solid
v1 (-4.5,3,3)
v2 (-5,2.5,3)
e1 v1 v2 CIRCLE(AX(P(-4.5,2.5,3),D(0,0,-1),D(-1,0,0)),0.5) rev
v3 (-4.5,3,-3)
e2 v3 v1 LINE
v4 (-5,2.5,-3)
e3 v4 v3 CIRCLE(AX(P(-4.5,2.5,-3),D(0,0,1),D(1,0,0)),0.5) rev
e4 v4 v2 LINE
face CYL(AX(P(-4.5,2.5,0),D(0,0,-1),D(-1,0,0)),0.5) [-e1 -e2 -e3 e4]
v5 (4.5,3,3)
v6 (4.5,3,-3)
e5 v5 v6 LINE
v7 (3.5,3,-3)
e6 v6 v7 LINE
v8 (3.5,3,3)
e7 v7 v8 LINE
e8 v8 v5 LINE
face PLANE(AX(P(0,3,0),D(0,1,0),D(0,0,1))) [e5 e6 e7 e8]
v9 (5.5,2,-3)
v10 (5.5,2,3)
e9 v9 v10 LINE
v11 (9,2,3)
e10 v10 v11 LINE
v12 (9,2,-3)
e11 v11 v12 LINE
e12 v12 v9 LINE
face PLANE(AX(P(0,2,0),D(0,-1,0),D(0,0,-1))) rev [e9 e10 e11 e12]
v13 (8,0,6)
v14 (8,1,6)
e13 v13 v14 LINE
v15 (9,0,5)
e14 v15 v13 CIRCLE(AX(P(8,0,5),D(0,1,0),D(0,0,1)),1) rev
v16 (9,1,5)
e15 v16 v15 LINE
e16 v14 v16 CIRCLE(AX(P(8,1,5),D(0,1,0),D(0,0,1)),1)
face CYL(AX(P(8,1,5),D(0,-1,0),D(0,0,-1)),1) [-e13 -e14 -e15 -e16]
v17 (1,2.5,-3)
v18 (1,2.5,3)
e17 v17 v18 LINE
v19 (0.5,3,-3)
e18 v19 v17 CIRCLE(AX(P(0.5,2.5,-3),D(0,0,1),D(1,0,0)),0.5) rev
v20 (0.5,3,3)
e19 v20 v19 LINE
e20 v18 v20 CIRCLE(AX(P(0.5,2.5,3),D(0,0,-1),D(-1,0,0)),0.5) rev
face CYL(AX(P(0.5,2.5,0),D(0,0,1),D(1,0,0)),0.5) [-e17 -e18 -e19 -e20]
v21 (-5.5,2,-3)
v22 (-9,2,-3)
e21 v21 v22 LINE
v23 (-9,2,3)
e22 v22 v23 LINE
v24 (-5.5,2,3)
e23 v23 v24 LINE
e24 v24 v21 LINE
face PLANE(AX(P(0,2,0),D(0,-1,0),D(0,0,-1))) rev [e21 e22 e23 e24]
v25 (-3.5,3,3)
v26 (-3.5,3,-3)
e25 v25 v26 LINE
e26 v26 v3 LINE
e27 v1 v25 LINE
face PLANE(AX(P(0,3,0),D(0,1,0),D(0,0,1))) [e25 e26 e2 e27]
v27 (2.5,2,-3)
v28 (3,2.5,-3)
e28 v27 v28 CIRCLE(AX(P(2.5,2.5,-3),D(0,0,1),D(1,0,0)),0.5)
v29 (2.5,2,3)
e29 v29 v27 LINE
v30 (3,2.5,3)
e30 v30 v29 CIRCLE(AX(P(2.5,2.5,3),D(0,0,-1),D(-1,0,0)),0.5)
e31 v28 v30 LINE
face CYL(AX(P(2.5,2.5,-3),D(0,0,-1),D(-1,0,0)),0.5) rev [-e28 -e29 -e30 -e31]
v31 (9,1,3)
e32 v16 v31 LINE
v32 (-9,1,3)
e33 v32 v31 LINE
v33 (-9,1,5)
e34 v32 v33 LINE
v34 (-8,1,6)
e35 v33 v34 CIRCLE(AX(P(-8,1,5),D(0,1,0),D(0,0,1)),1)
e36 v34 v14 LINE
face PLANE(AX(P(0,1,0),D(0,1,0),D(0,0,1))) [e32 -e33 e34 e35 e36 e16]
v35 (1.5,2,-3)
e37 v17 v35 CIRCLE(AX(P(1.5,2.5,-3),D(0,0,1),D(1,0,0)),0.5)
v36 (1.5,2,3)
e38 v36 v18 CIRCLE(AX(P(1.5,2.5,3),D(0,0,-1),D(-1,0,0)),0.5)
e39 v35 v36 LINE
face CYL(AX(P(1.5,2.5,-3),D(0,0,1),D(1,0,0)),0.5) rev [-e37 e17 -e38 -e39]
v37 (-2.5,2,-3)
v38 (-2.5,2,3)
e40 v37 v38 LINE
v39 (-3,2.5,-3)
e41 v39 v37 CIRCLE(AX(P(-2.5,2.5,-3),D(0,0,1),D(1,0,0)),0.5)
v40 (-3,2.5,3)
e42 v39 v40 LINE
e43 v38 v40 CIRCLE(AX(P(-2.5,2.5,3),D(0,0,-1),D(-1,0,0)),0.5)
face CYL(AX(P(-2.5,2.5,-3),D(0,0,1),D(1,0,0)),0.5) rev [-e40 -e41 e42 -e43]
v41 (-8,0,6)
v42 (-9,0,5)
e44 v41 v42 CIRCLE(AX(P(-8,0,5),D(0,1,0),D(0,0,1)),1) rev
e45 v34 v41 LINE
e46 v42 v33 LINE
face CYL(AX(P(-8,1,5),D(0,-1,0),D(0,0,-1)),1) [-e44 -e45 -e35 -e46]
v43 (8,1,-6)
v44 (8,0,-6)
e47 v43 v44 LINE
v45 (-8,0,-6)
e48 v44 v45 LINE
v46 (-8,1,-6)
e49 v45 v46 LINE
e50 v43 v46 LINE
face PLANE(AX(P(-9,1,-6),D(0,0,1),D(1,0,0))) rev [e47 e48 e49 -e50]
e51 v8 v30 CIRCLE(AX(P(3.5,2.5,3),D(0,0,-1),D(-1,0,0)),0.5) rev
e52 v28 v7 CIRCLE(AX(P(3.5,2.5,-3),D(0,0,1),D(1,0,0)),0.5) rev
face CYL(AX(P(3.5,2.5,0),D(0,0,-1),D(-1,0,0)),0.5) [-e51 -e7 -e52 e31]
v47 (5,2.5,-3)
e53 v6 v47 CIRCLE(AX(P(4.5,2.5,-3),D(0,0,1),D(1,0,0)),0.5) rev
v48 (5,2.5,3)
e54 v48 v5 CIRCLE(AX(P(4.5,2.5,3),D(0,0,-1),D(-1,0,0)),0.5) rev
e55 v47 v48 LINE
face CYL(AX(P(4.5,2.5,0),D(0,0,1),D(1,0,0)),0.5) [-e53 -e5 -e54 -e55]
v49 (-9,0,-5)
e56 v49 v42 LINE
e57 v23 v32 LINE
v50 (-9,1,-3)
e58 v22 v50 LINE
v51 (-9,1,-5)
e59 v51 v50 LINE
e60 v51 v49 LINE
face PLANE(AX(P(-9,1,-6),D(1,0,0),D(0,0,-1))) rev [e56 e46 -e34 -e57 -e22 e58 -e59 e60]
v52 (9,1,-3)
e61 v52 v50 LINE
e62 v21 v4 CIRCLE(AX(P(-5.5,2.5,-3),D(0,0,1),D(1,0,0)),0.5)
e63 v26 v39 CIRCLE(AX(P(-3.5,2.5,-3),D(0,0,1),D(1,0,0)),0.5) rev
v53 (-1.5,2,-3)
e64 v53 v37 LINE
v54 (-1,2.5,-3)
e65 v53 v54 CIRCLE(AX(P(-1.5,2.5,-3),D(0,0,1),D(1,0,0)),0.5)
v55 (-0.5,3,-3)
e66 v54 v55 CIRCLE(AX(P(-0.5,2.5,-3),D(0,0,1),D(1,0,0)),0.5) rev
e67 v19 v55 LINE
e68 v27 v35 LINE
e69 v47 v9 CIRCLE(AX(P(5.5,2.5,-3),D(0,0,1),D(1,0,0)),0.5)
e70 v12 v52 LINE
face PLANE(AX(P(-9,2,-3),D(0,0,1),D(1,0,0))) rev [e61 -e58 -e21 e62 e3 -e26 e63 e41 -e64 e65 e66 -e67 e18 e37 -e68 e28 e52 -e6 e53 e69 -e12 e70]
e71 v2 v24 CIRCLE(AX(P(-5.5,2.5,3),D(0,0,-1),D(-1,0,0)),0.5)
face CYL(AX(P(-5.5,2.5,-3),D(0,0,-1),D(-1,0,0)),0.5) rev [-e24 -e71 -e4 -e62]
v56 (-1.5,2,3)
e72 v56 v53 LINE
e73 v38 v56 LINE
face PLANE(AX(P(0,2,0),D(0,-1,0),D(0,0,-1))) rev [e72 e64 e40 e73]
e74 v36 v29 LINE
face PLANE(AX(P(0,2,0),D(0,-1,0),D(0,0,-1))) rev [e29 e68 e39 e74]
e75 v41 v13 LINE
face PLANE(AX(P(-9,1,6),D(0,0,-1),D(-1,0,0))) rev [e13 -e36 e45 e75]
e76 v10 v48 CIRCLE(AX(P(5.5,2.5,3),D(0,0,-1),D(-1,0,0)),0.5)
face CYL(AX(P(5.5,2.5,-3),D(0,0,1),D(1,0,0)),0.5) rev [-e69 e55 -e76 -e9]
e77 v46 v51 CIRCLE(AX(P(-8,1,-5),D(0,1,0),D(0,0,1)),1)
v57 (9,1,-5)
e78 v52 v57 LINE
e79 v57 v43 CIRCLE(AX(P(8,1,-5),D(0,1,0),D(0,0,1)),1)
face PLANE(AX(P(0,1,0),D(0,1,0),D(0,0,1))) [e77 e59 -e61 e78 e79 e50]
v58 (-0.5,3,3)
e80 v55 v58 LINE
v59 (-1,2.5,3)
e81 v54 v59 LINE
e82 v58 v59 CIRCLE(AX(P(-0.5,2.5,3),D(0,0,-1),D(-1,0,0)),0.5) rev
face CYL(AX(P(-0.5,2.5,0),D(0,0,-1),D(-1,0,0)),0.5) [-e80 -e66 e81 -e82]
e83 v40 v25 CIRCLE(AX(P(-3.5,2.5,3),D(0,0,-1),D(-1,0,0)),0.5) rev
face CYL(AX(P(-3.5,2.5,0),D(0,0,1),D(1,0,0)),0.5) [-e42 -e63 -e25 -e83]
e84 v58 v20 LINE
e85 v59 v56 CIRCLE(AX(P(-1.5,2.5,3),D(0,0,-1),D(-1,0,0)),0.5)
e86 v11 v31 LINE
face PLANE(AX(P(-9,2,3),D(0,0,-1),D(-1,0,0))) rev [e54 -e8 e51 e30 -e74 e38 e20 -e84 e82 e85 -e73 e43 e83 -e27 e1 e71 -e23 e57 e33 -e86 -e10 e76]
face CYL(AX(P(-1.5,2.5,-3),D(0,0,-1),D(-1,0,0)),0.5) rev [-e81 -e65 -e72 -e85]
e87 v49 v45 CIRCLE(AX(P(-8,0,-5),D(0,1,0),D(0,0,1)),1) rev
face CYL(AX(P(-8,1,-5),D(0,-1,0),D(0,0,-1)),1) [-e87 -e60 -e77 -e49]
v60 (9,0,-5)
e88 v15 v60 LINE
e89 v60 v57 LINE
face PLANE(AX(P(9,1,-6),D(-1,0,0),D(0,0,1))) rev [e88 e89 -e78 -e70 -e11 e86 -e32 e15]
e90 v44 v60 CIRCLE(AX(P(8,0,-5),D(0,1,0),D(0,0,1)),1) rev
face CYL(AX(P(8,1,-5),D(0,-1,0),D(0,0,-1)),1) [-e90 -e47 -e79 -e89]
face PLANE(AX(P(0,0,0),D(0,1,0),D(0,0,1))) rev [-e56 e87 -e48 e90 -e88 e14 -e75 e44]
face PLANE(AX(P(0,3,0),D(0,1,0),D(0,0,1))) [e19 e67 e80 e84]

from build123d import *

# Parameters (mm, degrees)
SKETCH2_W           = 18
SKETCH2_H           = 12
BOSS_EXTRUDE1_DEPTH = 1
FILLET1_R           = 1
SKETCH3_W           = 18
SKETCH3_H           = 6
BOSS_EXTRUDE2_DEPTH = 1
SKETCH4_W           = 2
SKETCH4_H           = 6
BOSS_EXTRUDE3_DEPTH = 1
FILLET2_START       = -4
FILLET2_DEPTH       = 8
FILLET2_START_2     = -3
FILLET2_2_DEPTH     = 6


with BuildPart() as part:
    # Sketch2 → Boss-Extrude1 (new body)
    with BuildSketch(Plane(origin=(0, 0, 0), x_dir=(1, 0, 0), z_dir=(0, 1, 0))):
        Rectangle(SKETCH2_W, SKETCH2_H)
    extrude(amount=BOSS_EXTRUDE1_DEPTH)

    # Fillet1
    fillet1_edges = [part.edges().sort_by_distance(p)[0] for p in [
        (9, 0.5, 6),
        (-9, 0.5, 6),
        (-9, 0.5, -6),
        (9, 0.5, -6),
    ]]
    fillet(fillet1_edges, radius=FILLET1_R)

    # Sketch3 → Boss-Extrude2 (add)
    with BuildSketch(Plane(origin=(0, 1, 0), x_dir=(1, 0, 0), z_dir=(0, 1, 0))):
        Rectangle(SKETCH3_W, SKETCH3_H)
    extrude(amount=BOSS_EXTRUDE2_DEPTH)

    # Sketch4 → Boss-Extrude3 (add)
    with BuildSketch(Plane(origin=(0, 2, 0), x_dir=(1, 0, 0), z_dir=(0, 1, 0))):
        Rectangle(SKETCH4_W, SKETCH4_H)
        with Locations((-4, 0)):
            Rectangle(SKETCH4_W, SKETCH4_H)
        with Locations((4, 0)):
            Rectangle(SKETCH4_W, SKETCH4_H)
    extrude(amount=BOSS_EXTRUDE3_DEPTH)

    # Fillet2: read off the stored shape, not the designer's step
    # Fillet2 outline → Fillet2 (cut)
    with BuildSketch(Plane.XY.offset(FILLET2_START)):
        with BuildLine():
            ThreePointArc((-5, 2.5), (-4.853553391, 2.853553391), (-4.5, 3))
            Line((-4.5, 3), (-5, 3))
            Line((-5, 3), (-5, 2.5))
        make_face()
        with BuildLine():
            ThreePointArc((-3.5, 3), (-3.146446609, 2.853553391), (-3, 2.5))
            Line((-3, 2.5), (-3, 3))
            Line((-3, 3), (-3.5, 3))
        make_face()
        with BuildLine():
            ThreePointArc((-1, 2.5), (-0.853553391, 2.853553391), (-0.5, 3))
            Line((-0.5, 3), (-1, 3))
            Line((-1, 3), (-1, 2.5))
        make_face()
        with BuildLine():
            ThreePointArc((0.5, 3), (0.853553391, 2.853553391), (1, 2.5))
            Line((1, 2.5), (1, 3))
            Line((1, 3), (0.5, 3))
        make_face()
        with BuildLine():
            ThreePointArc((3, 2.5), (3.146446609, 2.853553391), (3.5, 3))
            Line((3.5, 3), (3, 3))
            Line((3, 3), (3, 2.5))
        make_face()
        with BuildLine():
            ThreePointArc((4.5, 3), (4.853553391, 2.853553391), (5, 2.5))
            Line((5, 2.5), (5, 3))
            Line((5, 3), (4.5, 3))
        make_face()
    extrude(amount=FILLET2_DEPTH, mode=Mode.SUBTRACT)

    # Fillet2 2 outline → Fillet2 2 (add)
    with BuildSketch(Plane.XY.offset(FILLET2_START_2)):
        with BuildLine():
            Line((-5, 2), (-5, 2.5))
            ThreePointArc((-5, 2.5), (-5.146446609, 2.146446609), (-5.5, 2))
            Line((-5.5, 2), (-5, 2))
        make_face()
        with BuildLine():
            Line((-3, 2), (-2.5, 2))
            ThreePointArc((-2.5, 2), (-2.853553391, 2.146446609), (-3, 2.5))
            Line((-3, 2.5), (-3, 2))
        make_face()
        with BuildLine():
            Line((-1, 2), (-1, 2.5))
            ThreePointArc((-1, 2.5), (-1.146446609, 2.146446609), (-1.5, 2))
            Line((-1.5, 2), (-1, 2))
        make_face()
        with BuildLine():
            Line((1, 2), (1.5, 2))
            ThreePointArc((1.5, 2), (1.146446609, 2.146446609), (1, 2.5))
            Line((1, 2.5), (1, 2))
        make_face()
        with BuildLine():
            Line((3, 2), (3, 2.5))
            ThreePointArc((3, 2.5), (2.853553391, 2.146446609), (2.5, 2))
            Line((2.5, 2), (3, 2))
        make_face()
        with BuildLine():
            ThreePointArc((5.5, 2), (5.146446609, 2.146446609), (5, 2.5))
            Line((5, 2.5), (5, 2))
            Line((5, 2), (5.5, 2))
        make_face()
    extrude(amount=FILLET2_2_DEPTH)


solid = part.part
